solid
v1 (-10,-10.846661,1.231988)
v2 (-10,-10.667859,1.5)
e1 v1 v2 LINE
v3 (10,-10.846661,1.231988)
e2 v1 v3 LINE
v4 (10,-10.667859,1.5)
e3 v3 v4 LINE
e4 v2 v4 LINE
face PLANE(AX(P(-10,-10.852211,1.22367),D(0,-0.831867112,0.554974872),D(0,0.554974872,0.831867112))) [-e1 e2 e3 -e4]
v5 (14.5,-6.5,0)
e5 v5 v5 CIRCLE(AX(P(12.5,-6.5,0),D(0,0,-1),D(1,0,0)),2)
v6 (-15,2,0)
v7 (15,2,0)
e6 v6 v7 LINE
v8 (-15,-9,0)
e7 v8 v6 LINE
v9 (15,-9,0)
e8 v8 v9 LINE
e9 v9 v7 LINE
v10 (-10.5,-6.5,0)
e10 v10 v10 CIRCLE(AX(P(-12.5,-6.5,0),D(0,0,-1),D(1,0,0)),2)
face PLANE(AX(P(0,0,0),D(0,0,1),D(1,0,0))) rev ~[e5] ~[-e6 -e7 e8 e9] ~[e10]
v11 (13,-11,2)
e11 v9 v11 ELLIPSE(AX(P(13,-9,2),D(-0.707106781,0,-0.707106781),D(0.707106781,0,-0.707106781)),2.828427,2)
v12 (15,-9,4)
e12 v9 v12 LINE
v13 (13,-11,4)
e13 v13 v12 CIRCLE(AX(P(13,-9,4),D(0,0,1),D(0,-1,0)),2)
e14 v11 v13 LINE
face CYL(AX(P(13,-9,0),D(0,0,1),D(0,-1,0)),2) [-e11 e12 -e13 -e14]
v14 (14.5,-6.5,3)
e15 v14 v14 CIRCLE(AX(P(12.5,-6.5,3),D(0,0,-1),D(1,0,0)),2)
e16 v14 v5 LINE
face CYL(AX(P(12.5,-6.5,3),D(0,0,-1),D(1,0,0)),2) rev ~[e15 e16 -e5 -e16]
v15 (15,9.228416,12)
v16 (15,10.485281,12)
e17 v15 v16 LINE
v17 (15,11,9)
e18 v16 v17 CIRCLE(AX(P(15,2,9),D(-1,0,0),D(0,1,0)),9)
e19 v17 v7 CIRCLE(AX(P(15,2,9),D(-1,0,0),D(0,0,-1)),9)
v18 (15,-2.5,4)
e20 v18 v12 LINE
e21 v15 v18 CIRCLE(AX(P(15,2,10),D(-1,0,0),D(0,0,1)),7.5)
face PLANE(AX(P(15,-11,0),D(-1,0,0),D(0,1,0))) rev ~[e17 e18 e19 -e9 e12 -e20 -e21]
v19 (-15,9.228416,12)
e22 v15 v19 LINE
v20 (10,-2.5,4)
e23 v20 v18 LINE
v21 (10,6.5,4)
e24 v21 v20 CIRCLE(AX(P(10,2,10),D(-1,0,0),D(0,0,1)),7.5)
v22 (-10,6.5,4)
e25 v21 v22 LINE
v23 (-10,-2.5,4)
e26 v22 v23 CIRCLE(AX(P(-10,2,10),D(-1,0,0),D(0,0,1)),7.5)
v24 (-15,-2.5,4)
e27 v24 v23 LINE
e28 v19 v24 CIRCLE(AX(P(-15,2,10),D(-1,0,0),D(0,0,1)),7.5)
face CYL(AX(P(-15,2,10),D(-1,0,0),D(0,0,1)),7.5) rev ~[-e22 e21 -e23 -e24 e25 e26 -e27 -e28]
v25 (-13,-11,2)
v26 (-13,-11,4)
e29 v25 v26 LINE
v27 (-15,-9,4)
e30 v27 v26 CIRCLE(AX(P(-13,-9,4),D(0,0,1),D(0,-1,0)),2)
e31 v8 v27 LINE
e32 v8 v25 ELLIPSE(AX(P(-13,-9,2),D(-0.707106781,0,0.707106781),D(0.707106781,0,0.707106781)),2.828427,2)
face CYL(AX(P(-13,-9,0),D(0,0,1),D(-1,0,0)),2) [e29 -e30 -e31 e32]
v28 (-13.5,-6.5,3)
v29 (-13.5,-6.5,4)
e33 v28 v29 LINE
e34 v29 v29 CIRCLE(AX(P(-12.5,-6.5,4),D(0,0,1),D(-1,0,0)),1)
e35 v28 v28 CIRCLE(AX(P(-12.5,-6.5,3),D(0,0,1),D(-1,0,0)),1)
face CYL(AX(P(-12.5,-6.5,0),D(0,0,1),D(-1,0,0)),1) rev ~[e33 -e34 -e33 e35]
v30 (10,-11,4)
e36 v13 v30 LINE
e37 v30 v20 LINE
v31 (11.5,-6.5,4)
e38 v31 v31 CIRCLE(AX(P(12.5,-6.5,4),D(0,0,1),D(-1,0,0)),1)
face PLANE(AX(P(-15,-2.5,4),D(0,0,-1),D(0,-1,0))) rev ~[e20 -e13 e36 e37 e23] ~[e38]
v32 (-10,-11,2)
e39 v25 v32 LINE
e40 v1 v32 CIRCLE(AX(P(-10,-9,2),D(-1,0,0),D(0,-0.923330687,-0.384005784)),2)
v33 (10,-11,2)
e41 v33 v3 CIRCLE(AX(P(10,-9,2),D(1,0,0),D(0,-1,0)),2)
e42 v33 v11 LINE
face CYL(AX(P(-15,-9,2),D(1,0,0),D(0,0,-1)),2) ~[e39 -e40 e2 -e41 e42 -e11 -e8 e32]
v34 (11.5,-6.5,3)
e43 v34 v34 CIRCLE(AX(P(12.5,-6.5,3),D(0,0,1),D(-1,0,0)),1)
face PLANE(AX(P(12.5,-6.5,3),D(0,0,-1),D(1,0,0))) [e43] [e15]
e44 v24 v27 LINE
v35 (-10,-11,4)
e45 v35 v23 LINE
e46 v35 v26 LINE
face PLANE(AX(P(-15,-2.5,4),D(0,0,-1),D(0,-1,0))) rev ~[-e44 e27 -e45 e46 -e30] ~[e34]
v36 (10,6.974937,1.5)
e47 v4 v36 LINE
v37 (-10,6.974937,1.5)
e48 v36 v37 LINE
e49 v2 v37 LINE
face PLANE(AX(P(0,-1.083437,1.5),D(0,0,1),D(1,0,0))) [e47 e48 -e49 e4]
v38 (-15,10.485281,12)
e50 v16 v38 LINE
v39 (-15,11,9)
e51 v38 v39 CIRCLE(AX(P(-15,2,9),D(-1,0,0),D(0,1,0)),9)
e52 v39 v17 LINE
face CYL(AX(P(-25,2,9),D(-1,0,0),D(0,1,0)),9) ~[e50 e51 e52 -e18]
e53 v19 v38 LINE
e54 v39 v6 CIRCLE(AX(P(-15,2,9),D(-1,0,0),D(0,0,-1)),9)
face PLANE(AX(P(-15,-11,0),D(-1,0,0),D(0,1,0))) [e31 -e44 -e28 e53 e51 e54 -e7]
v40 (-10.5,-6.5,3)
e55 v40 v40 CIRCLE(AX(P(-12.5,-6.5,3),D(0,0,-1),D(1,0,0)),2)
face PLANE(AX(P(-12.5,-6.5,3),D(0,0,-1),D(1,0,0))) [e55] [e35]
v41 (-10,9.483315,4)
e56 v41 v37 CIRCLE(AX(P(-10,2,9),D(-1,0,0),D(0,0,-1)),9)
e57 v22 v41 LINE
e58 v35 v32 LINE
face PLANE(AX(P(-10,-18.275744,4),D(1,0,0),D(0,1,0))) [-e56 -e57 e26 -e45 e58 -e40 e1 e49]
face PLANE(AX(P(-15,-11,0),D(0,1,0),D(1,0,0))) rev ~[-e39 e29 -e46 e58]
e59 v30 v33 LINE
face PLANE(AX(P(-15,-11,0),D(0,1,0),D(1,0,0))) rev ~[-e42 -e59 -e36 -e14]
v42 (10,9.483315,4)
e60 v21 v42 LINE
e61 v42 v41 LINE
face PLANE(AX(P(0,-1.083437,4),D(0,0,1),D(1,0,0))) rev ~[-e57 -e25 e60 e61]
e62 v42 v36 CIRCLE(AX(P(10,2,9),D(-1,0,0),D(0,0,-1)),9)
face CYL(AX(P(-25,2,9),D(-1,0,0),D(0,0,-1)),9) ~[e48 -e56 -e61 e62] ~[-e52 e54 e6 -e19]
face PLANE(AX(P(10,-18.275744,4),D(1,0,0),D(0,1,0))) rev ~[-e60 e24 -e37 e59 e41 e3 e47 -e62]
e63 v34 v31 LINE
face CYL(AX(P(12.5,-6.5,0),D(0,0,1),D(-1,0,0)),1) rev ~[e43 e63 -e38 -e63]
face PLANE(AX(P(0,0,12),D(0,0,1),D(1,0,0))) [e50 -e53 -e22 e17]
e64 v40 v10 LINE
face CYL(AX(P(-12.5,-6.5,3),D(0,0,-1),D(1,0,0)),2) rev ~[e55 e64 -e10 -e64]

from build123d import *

# Parameters (mm, degrees)
F0_W            = 30
F0_H            = 22
F1_DEPTH        = 12
F3_DEPTH        = 30.001
F3_DEPTH_BACK   = 25
F5_START        = -25
F5_DEPTH        = 40.001
F6_R            = 2
F7_W            = 20
F7_H            = 34.384613307
F8_DEPTH        = 2.5
F9_T1_DEPTH     = 20
F11_D           = 2
F11_DEPTH       = 8
F11_CBORE_D     = 4
F11_CBORE_DEPTH = 3
F11_TIP         = 0.600860619


# Not quite as in the source:
# - a fillet or chamfer that OpenCascade refuses, or shapes differently, is made with other operations: its cross-section is extruded or revolved along the edge and cut away or added


with BuildPart() as f1:
    # F0 (on Top) → F1 (new body)
    with BuildSketch(Plane.XY):
        Rectangle(F0_W, F0_H)
    extrude(amount=F1_DEPTH)

    # F2 (on face) → F3 (cut, two sides)
    with BuildSketch(Plane(origin=(-15, 0, 0), x_dir=(0, -1, 0), z_dir=(-1, 0, 0))) as f3_sk:
        with BuildLine():
            ThreePointArc((2.5, 4), (4.7082039325, 6.6458980338), (5.5, 10))
            ThreePointArc((5.5, 10), (3.3033008589, 15.3033008589), (-2, 17.5))
            Line((-2, 17.5), (-2, 4))
            Line((-2, 4), (2.5, 4))
        make_face()
        with BuildLine():
            ThreePointArc((-2, 17.5), (3.3033008589, 15.3033008589), (5.5, 10))
            ThreePointArc((5.5, 10), (4.7082039325, 6.6458980338), (2.5, 4))
            Line((2.5, 4), (15.6530104578, 4))
            Line((15.6530104578, 4), (15.6530104578, 18.6757147312))
            Line((15.6530104578, 18.6757147312), (-2, 18.6757147312))
            Line((-2, 18.6757147312), (-2, 17.5))
        make_face()
        with BuildLine():
            Line((-2, 4), (-2, 17.5))
            ThreePointArc((-2, 17.5), (-9.1151247354, 7.6282917549), (2.5, 4))
            Line((2.5, 4), (-2, 4))
        make_face()
    extrude(amount=-F3_DEPTH, mode=Mode.SUBTRACT)
    extrude(f3_sk.sketch, amount=F3_DEPTH_BACK, mode=Mode.SUBTRACT)

    # F4 (on Right) → F5 (intersect)
    with BuildSketch(Plane.YZ.offset(F5_START)):
        with BuildLine():
            ThreePointArc((2, 0), (8.3639610307, 2.6360389693), (11, 9))
            ThreePointArc((11, 9), (8.3639610307, 15.3639610307), (2, 18))
            Line((2, 18), (2, 0))
        make_face()
        with BuildLine():
            Line((2, 0), (2, 18))
            ThreePointArc((2, 18), (-7, 9), (2, 0))
        make_face()
        with BuildLine():
            ThreePointArc((2, 0), (-7, 9), (2, 18))
            Line((2, 18), (2, 22.4318560213))
            Line((2, 22.4318560213), (-24.2340825498, 22.4318560213))
            Line((-24.2340825498, 22.4318560213), (-24.2340825498, -9.0490430593))
            Line((-24.2340825498, -9.0490430593), (2, -9.0490430593))
            Line((2, -9.0490430593), (2, 0))
        make_face()
    extrude(amount=F5_DEPTH, mode=Mode.INTERSECT)

    # F6
    f6_edges = [f1.edges().sort_by_distance(p)[0] for p in [
        (0, -11, 0),
        (-15, -11, 2),
        (15, -11, 2),
    ]]
    fillet(f6_edges, radius=F6_R)

    # F7 (on face) → F8 (cut)
    with BuildSketch(Plane.XY.offset(4)):
        with Locations((0, -1.0834368877)):
            Rectangle(F7_W, F7_H)
    extrude(amount=-F8_DEPTH, mode=Mode.SUBTRACT)

    # F9: chamfer of 0.25 on 1 edges, made by hand

    # F9_s2 → F9_t1 (cut)
    with BuildSketch(Plane.YZ.offset(-10)):
        with BuildLine():
            Line((-10.8522111232, 1.2236697613), (-10.662309407, 1.5083186711))
            Line((-10.662309407, 1.5083186711), (-10.662309407, 1.5133186711))
            ThreePointArc((-10.662309407, 1.5133186711), (-10.7994005401, 1.505), (-10.9364916731, 1.505))
            Line((-10.9364916731, 1.505), (-10.9413329023, 1.49875))
            ThreePointArc((-10.9413329023, 1.49875), (-10.9000798671, 1.3599050861), (-10.8568277766, 1.2217497324))
            Line((-10.8568277766, 1.2217497324), (-10.8522111232, 1.2236697613))
        make_face()
    extrude(amount=F9_T1_DEPTH, mode=Mode.SUBTRACT)

    # F11
    with Locations(Plane(origin=(0, 0, 0), x_dir=(1, 0, 0), z_dir=(0, 0, -1))):
        with Locations((12.5, 6.5), (-12.5, 6.5)):
            CounterBoreHole(F11_D / 2, F11_CBORE_D / 2, F11_CBORE_DEPTH, depth=F11_DEPTH)
            with Locations((0, 0, -(F11_DEPTH + F11_TIP / 2))):  # 118° drill point
                Cone(0, F11_D / 2, F11_TIP, mode=Mode.SUBTRACT)


solid = f1.part
